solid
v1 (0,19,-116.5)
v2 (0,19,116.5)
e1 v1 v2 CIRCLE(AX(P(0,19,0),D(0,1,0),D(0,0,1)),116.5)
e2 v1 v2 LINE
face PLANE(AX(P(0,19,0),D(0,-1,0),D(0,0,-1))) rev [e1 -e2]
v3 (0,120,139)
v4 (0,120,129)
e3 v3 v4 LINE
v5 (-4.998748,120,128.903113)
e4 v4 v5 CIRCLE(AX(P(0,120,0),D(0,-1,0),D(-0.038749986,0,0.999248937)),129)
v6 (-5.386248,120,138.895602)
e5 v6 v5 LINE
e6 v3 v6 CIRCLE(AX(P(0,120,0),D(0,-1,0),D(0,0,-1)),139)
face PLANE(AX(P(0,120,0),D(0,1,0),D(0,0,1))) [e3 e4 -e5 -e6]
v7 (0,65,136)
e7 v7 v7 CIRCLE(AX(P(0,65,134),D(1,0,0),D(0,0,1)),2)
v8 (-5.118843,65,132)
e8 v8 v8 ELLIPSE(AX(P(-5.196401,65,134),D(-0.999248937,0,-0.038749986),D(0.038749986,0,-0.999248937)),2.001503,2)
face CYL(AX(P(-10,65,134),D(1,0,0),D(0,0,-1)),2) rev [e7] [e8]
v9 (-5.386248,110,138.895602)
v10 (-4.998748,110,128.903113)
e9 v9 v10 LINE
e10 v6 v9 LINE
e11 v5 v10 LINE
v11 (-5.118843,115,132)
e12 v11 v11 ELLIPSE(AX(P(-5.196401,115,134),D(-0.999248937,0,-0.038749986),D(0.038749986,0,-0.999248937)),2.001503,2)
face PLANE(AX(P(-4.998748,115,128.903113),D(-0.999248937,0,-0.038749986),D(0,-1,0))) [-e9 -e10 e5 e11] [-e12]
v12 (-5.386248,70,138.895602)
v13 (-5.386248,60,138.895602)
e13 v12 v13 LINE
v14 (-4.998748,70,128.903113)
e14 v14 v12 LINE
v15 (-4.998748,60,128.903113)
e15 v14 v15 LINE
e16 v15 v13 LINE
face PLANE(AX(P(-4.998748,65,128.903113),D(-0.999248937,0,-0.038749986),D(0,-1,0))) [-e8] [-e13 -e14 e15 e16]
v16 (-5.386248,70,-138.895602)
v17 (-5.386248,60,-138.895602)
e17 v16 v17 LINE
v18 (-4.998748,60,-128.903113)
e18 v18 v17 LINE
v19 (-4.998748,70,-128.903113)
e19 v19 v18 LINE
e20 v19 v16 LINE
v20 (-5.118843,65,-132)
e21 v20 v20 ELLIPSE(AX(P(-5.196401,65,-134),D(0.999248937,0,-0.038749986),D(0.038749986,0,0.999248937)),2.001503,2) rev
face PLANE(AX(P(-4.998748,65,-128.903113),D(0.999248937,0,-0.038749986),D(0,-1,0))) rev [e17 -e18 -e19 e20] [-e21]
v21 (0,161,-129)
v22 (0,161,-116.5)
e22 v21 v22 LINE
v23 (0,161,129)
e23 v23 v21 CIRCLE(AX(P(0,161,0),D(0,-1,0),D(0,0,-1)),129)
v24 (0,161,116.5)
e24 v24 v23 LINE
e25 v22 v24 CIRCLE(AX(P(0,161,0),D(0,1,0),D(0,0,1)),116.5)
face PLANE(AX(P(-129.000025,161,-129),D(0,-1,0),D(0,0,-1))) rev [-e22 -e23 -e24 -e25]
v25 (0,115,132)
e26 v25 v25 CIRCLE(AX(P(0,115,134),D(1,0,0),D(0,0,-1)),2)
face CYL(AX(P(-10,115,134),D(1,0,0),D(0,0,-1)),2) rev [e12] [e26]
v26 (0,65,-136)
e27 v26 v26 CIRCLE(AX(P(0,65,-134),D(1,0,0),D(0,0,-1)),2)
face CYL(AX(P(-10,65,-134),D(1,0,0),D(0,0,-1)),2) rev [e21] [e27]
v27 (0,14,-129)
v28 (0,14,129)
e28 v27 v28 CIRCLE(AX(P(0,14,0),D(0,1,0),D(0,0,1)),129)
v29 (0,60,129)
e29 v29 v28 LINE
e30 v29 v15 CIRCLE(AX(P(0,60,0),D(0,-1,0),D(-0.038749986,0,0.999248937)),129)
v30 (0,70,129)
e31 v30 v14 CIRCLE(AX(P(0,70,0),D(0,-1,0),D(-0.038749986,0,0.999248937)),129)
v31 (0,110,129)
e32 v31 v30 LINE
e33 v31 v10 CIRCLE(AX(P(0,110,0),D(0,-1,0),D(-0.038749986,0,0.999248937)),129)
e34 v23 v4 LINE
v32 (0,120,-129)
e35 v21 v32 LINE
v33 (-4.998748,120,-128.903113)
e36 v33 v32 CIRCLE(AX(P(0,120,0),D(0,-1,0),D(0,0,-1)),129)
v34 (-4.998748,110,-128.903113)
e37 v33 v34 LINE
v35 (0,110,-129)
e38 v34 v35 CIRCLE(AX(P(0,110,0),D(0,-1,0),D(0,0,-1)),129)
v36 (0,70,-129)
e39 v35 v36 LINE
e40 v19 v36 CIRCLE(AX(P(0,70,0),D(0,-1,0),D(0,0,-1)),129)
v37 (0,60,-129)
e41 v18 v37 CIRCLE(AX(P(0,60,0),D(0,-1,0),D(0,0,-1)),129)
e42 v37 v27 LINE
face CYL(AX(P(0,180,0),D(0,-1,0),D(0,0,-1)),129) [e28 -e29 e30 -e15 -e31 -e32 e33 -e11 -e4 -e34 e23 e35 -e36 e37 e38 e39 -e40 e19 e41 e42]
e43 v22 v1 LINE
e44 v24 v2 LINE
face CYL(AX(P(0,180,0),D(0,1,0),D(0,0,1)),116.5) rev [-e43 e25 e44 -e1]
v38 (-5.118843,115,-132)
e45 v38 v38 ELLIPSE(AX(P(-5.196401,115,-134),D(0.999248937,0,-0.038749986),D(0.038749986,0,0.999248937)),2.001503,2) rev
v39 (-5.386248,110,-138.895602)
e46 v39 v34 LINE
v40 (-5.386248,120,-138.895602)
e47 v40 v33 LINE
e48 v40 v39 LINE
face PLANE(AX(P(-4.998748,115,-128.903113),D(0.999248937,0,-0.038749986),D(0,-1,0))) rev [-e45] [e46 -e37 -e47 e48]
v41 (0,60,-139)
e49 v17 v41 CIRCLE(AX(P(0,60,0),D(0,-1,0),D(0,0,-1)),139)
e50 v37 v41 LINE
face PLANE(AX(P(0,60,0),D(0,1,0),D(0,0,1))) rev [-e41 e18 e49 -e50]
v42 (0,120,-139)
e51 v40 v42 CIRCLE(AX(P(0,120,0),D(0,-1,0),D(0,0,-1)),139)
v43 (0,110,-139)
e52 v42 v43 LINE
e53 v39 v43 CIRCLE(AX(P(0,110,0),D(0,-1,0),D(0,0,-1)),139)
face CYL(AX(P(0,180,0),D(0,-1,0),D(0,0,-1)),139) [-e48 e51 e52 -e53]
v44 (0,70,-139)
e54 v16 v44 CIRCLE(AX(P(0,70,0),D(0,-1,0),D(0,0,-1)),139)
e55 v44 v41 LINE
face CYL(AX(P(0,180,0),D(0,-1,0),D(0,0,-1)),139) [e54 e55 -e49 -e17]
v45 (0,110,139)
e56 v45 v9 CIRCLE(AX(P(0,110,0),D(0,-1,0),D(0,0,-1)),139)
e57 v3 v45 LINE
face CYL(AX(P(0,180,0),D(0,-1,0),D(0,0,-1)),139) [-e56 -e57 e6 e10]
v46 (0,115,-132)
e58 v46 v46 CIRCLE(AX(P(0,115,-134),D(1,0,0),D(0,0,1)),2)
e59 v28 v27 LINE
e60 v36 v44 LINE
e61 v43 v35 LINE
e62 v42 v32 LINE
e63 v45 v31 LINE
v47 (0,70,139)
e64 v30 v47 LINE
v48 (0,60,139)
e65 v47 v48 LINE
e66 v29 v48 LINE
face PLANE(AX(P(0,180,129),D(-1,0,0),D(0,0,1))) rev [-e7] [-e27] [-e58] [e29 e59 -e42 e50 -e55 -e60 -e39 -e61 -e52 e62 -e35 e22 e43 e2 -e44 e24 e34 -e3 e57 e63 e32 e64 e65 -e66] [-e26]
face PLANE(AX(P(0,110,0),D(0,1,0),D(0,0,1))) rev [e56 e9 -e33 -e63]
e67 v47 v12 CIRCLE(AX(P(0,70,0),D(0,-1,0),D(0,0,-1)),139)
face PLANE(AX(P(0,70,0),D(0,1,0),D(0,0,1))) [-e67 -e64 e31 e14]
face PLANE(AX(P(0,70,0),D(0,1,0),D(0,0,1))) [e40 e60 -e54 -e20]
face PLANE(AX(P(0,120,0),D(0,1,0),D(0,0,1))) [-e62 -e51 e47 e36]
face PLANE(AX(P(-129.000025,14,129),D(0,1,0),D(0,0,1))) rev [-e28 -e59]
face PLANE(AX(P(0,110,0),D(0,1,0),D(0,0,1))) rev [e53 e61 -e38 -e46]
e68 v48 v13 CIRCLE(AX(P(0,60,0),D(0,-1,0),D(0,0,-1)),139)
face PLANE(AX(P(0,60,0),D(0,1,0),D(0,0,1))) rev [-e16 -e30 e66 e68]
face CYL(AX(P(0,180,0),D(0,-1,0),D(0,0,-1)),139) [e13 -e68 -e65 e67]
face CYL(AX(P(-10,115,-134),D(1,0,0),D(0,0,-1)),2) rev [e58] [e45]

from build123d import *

# Parameters (mm, degrees)
BOSS_EXTRUDE1_DEPTH      = 180
SKETCH3_W                = 116.5
SKETCH3_H                = 142
CUT_REVOLVE1_ANGLE       = 271
WRAP1_SECTION_W          = 10
WRAP1_SECTION_H          = 10
WRAP1_ANGLE              = 2.220766648
WRAP1_SECTOR_2_SECTION_W = 10
WRAP1_SECTOR_2_SECTION_H = 10
WRAP1_SECTOR_2_ANGLE     = 2.220766648
MIRROR1_START            = 60
MIRROR1_DEPTH            = 10
MIRROR1_START_2          = 110
MIRROR1_2_DEPTH          = 10
CUT_EXTRUDE6_DEPTH       = 262.461278204
CUT_EXTRUDE6_DEPTH_BACK  = 20
SKETCH17_R               = 2
CUT_EXTRUDE7_DEPTH       = 10
CUT_EXTRUDE9_DEPTH       = 262.461278204
CUT_EXTRUDE9_DEPTH_BACK  = 262.461278204
SKETCH19_W               = 258
SKETCH19_H               = 15.225908702
CUT_EXTRUDE10_DEPTH      = 252.222015682
CUT_EXTRUDE10_DEPTH_BACK = 252.222015682
SKETCH22_W               = 258
SKETCH22_H               = 14
SKETCH22_H_2             = 3.774091298


# Read off the part's stored shape, not the designer's step: Mirror1
with BuildPart() as part:
    # Sketch1 → Boss-Extrude1 (new body)
    with BuildSketch(Plane(origin=(0, 0, 0), x_dir=(1, 0, 0), z_dir=(0, 1, 0))):
        with BuildLine():
            Line((0, -129), (0, 129))
            ThreePointArc((0, 129), (-129, 0), (0, -129))
        make_face()
    extrude(amount=BOSS_EXTRUDE1_DEPTH)

    # Sketch3 → Cut-Revolve1 (revolve, cut)
    with BuildSketch(Plane(origin=(0, 0, 0), x_dir=(0, 0, -1), z_dir=(1, 0, 0))):
        with Locations((-58.25, 90)):
            Rectangle(SKETCH3_W, SKETCH3_H)
    revolve(axis=Axis((0, 180, 0), (0, -1, 0)), revolution_arc=CUT_REVOLVE1_ANGLE, mode=Mode.SUBTRACT)

    # Wrap1 section (on wrap section) → Wrap1 (revolve)
    with BuildSketch(Plane(origin=(0, 0, 0), x_dir=(0, 0, 1), z_dir=(1, 0, 0))):
        with Locations((134, -115)):
            Rectangle(WRAP1_SECTION_W, WRAP1_SECTION_H)
    revolve(axis=Axis((0, 0, 0), (0, -1, 0)), revolution_arc=WRAP1_ANGLE)

    # Wrap1 sector 2 section (on wrap section) → Wrap1 sector 2 (revolve)
    with BuildSketch(Plane(origin=(0, 0, 0), x_dir=(0, 0, 1), z_dir=(1, 0, 0))):
        with Locations((134, -65)):
            Rectangle(WRAP1_SECTOR_2_SECTION_W, WRAP1_SECTOR_2_SECTION_H)
    revolve(axis=Axis((0, 0, 0), (0, -1, 0)), revolution_arc=WRAP1_SECTOR_2_ANGLE)

    # Mirror1 outline → Mirror1 (add)
    with BuildSketch(Plane(origin=(0, 0, 0), x_dir=(1, 0, 0), z_dir=(0, 1, 0)).offset(MIRROR1_START)):
        with BuildLine():
            ThreePointArc((0, 139), (-2.693629831, 138.973898119), (-5.386248024, 138.895602278))
            Line((-5.386248024, 138.895602278), (-4.998748166, 128.903112906))
            ThreePointArc((-4.998748166, 128.903112906), (-2.499843512, 128.975775952), (0, 129))
            Line((0, 129), (0, 139))
        make_face()
    extrude(amount=MIRROR1_DEPTH)

    # Mirror1 2 outline → Mirror1 2 (add)
    with BuildSketch(Plane(origin=(0, 0, 0), x_dir=(1, 0, 0), z_dir=(0, 1, 0)).offset(MIRROR1_START_2)):
        with BuildLine():
            ThreePointArc((0, 139), (-2.693629831, 138.973898119), (-5.386248024, 138.895602278))
            Line((-5.386248024, 138.895602278), (-4.998748166, 128.903112906))
            ThreePointArc((-4.998748166, 128.903112906), (-2.499843512, 128.975775952), (0, 129))
            Line((0, 129), (0, 139))
        make_face()
    extrude(amount=MIRROR1_2_DEPTH)

    # Sketch16 → Cut-Extrude6 (cut, two sides: drawn at the far end of the back side and taken through both)
    with BuildSketch(Plane(origin=(0, 180, 0), x_dir=(1, 0, 0), z_dir=(0, 1, 0)).offset(-CUT_EXTRUDE6_DEPTH_BACK)):
        with BuildLine():
            Line((0, 100), (0, -100))
            ThreePointArc((0, -100), (-100, 0), (0, 100))
        make_face()
    extrude(amount=CUT_EXTRUDE6_DEPTH + CUT_EXTRUDE6_DEPTH_BACK, mode=Mode.SUBTRACT)

    # Sketch17 → Cut-Extrude7 (cut)
    with BuildSketch(Plane(origin=(0, 0, 0), x_dir=(0, 0, -1), z_dir=(1, 0, 0))):
        with Locations((-134, 115)):
            Circle(SKETCH17_R)
        with Locations((-134, 65)):
            Circle(SKETCH17_R)
        with Locations(Location((134, 115, 0), (0, 0, 180))):
            Circle(SKETCH17_R)
        with Locations((134, 65)):
            Circle(SKETCH17_R)
    extrude(amount=-CUT_EXTRUDE7_DEPTH, mode=Mode.SUBTRACT)

    # Sketch19 → Cut-Extrude9 (cut, two sides: drawn at the far end of the back side and taken through both)
    with BuildSketch(Plane(origin=(0, 0, 0), x_dir=(0, 0, -1), z_dir=(1, 0, 0)).offset(-CUT_EXTRUDE9_DEPTH_BACK)):
        with Locations((0, 172.387045649)):
            Rectangle(SKETCH19_W, SKETCH19_H)
    extrude(amount=CUT_EXTRUDE9_DEPTH + CUT_EXTRUDE9_DEPTH_BACK, mode=Mode.SUBTRACT)

    # Sketch22 → Cut-Extrude10 (cut, two sides: drawn at the far end of the back side and taken through both)
    with BuildSketch(Plane(origin=(0, 0, 0), x_dir=(0, 0, -1), z_dir=(1, 0, 0)).offset(-CUT_EXTRUDE10_DEPTH_BACK)):
        with Locations((0, 7)):
            Rectangle(SKETCH22_W, SKETCH22_H)
        with Locations((0, 162.887045649)):
            Rectangle(SKETCH22_W, SKETCH22_H_2)
    extrude(amount=CUT_EXTRUDE10_DEPTH + CUT_EXTRUDE10_DEPTH_BACK, mode=Mode.SUBTRACT)


solid = part.part
